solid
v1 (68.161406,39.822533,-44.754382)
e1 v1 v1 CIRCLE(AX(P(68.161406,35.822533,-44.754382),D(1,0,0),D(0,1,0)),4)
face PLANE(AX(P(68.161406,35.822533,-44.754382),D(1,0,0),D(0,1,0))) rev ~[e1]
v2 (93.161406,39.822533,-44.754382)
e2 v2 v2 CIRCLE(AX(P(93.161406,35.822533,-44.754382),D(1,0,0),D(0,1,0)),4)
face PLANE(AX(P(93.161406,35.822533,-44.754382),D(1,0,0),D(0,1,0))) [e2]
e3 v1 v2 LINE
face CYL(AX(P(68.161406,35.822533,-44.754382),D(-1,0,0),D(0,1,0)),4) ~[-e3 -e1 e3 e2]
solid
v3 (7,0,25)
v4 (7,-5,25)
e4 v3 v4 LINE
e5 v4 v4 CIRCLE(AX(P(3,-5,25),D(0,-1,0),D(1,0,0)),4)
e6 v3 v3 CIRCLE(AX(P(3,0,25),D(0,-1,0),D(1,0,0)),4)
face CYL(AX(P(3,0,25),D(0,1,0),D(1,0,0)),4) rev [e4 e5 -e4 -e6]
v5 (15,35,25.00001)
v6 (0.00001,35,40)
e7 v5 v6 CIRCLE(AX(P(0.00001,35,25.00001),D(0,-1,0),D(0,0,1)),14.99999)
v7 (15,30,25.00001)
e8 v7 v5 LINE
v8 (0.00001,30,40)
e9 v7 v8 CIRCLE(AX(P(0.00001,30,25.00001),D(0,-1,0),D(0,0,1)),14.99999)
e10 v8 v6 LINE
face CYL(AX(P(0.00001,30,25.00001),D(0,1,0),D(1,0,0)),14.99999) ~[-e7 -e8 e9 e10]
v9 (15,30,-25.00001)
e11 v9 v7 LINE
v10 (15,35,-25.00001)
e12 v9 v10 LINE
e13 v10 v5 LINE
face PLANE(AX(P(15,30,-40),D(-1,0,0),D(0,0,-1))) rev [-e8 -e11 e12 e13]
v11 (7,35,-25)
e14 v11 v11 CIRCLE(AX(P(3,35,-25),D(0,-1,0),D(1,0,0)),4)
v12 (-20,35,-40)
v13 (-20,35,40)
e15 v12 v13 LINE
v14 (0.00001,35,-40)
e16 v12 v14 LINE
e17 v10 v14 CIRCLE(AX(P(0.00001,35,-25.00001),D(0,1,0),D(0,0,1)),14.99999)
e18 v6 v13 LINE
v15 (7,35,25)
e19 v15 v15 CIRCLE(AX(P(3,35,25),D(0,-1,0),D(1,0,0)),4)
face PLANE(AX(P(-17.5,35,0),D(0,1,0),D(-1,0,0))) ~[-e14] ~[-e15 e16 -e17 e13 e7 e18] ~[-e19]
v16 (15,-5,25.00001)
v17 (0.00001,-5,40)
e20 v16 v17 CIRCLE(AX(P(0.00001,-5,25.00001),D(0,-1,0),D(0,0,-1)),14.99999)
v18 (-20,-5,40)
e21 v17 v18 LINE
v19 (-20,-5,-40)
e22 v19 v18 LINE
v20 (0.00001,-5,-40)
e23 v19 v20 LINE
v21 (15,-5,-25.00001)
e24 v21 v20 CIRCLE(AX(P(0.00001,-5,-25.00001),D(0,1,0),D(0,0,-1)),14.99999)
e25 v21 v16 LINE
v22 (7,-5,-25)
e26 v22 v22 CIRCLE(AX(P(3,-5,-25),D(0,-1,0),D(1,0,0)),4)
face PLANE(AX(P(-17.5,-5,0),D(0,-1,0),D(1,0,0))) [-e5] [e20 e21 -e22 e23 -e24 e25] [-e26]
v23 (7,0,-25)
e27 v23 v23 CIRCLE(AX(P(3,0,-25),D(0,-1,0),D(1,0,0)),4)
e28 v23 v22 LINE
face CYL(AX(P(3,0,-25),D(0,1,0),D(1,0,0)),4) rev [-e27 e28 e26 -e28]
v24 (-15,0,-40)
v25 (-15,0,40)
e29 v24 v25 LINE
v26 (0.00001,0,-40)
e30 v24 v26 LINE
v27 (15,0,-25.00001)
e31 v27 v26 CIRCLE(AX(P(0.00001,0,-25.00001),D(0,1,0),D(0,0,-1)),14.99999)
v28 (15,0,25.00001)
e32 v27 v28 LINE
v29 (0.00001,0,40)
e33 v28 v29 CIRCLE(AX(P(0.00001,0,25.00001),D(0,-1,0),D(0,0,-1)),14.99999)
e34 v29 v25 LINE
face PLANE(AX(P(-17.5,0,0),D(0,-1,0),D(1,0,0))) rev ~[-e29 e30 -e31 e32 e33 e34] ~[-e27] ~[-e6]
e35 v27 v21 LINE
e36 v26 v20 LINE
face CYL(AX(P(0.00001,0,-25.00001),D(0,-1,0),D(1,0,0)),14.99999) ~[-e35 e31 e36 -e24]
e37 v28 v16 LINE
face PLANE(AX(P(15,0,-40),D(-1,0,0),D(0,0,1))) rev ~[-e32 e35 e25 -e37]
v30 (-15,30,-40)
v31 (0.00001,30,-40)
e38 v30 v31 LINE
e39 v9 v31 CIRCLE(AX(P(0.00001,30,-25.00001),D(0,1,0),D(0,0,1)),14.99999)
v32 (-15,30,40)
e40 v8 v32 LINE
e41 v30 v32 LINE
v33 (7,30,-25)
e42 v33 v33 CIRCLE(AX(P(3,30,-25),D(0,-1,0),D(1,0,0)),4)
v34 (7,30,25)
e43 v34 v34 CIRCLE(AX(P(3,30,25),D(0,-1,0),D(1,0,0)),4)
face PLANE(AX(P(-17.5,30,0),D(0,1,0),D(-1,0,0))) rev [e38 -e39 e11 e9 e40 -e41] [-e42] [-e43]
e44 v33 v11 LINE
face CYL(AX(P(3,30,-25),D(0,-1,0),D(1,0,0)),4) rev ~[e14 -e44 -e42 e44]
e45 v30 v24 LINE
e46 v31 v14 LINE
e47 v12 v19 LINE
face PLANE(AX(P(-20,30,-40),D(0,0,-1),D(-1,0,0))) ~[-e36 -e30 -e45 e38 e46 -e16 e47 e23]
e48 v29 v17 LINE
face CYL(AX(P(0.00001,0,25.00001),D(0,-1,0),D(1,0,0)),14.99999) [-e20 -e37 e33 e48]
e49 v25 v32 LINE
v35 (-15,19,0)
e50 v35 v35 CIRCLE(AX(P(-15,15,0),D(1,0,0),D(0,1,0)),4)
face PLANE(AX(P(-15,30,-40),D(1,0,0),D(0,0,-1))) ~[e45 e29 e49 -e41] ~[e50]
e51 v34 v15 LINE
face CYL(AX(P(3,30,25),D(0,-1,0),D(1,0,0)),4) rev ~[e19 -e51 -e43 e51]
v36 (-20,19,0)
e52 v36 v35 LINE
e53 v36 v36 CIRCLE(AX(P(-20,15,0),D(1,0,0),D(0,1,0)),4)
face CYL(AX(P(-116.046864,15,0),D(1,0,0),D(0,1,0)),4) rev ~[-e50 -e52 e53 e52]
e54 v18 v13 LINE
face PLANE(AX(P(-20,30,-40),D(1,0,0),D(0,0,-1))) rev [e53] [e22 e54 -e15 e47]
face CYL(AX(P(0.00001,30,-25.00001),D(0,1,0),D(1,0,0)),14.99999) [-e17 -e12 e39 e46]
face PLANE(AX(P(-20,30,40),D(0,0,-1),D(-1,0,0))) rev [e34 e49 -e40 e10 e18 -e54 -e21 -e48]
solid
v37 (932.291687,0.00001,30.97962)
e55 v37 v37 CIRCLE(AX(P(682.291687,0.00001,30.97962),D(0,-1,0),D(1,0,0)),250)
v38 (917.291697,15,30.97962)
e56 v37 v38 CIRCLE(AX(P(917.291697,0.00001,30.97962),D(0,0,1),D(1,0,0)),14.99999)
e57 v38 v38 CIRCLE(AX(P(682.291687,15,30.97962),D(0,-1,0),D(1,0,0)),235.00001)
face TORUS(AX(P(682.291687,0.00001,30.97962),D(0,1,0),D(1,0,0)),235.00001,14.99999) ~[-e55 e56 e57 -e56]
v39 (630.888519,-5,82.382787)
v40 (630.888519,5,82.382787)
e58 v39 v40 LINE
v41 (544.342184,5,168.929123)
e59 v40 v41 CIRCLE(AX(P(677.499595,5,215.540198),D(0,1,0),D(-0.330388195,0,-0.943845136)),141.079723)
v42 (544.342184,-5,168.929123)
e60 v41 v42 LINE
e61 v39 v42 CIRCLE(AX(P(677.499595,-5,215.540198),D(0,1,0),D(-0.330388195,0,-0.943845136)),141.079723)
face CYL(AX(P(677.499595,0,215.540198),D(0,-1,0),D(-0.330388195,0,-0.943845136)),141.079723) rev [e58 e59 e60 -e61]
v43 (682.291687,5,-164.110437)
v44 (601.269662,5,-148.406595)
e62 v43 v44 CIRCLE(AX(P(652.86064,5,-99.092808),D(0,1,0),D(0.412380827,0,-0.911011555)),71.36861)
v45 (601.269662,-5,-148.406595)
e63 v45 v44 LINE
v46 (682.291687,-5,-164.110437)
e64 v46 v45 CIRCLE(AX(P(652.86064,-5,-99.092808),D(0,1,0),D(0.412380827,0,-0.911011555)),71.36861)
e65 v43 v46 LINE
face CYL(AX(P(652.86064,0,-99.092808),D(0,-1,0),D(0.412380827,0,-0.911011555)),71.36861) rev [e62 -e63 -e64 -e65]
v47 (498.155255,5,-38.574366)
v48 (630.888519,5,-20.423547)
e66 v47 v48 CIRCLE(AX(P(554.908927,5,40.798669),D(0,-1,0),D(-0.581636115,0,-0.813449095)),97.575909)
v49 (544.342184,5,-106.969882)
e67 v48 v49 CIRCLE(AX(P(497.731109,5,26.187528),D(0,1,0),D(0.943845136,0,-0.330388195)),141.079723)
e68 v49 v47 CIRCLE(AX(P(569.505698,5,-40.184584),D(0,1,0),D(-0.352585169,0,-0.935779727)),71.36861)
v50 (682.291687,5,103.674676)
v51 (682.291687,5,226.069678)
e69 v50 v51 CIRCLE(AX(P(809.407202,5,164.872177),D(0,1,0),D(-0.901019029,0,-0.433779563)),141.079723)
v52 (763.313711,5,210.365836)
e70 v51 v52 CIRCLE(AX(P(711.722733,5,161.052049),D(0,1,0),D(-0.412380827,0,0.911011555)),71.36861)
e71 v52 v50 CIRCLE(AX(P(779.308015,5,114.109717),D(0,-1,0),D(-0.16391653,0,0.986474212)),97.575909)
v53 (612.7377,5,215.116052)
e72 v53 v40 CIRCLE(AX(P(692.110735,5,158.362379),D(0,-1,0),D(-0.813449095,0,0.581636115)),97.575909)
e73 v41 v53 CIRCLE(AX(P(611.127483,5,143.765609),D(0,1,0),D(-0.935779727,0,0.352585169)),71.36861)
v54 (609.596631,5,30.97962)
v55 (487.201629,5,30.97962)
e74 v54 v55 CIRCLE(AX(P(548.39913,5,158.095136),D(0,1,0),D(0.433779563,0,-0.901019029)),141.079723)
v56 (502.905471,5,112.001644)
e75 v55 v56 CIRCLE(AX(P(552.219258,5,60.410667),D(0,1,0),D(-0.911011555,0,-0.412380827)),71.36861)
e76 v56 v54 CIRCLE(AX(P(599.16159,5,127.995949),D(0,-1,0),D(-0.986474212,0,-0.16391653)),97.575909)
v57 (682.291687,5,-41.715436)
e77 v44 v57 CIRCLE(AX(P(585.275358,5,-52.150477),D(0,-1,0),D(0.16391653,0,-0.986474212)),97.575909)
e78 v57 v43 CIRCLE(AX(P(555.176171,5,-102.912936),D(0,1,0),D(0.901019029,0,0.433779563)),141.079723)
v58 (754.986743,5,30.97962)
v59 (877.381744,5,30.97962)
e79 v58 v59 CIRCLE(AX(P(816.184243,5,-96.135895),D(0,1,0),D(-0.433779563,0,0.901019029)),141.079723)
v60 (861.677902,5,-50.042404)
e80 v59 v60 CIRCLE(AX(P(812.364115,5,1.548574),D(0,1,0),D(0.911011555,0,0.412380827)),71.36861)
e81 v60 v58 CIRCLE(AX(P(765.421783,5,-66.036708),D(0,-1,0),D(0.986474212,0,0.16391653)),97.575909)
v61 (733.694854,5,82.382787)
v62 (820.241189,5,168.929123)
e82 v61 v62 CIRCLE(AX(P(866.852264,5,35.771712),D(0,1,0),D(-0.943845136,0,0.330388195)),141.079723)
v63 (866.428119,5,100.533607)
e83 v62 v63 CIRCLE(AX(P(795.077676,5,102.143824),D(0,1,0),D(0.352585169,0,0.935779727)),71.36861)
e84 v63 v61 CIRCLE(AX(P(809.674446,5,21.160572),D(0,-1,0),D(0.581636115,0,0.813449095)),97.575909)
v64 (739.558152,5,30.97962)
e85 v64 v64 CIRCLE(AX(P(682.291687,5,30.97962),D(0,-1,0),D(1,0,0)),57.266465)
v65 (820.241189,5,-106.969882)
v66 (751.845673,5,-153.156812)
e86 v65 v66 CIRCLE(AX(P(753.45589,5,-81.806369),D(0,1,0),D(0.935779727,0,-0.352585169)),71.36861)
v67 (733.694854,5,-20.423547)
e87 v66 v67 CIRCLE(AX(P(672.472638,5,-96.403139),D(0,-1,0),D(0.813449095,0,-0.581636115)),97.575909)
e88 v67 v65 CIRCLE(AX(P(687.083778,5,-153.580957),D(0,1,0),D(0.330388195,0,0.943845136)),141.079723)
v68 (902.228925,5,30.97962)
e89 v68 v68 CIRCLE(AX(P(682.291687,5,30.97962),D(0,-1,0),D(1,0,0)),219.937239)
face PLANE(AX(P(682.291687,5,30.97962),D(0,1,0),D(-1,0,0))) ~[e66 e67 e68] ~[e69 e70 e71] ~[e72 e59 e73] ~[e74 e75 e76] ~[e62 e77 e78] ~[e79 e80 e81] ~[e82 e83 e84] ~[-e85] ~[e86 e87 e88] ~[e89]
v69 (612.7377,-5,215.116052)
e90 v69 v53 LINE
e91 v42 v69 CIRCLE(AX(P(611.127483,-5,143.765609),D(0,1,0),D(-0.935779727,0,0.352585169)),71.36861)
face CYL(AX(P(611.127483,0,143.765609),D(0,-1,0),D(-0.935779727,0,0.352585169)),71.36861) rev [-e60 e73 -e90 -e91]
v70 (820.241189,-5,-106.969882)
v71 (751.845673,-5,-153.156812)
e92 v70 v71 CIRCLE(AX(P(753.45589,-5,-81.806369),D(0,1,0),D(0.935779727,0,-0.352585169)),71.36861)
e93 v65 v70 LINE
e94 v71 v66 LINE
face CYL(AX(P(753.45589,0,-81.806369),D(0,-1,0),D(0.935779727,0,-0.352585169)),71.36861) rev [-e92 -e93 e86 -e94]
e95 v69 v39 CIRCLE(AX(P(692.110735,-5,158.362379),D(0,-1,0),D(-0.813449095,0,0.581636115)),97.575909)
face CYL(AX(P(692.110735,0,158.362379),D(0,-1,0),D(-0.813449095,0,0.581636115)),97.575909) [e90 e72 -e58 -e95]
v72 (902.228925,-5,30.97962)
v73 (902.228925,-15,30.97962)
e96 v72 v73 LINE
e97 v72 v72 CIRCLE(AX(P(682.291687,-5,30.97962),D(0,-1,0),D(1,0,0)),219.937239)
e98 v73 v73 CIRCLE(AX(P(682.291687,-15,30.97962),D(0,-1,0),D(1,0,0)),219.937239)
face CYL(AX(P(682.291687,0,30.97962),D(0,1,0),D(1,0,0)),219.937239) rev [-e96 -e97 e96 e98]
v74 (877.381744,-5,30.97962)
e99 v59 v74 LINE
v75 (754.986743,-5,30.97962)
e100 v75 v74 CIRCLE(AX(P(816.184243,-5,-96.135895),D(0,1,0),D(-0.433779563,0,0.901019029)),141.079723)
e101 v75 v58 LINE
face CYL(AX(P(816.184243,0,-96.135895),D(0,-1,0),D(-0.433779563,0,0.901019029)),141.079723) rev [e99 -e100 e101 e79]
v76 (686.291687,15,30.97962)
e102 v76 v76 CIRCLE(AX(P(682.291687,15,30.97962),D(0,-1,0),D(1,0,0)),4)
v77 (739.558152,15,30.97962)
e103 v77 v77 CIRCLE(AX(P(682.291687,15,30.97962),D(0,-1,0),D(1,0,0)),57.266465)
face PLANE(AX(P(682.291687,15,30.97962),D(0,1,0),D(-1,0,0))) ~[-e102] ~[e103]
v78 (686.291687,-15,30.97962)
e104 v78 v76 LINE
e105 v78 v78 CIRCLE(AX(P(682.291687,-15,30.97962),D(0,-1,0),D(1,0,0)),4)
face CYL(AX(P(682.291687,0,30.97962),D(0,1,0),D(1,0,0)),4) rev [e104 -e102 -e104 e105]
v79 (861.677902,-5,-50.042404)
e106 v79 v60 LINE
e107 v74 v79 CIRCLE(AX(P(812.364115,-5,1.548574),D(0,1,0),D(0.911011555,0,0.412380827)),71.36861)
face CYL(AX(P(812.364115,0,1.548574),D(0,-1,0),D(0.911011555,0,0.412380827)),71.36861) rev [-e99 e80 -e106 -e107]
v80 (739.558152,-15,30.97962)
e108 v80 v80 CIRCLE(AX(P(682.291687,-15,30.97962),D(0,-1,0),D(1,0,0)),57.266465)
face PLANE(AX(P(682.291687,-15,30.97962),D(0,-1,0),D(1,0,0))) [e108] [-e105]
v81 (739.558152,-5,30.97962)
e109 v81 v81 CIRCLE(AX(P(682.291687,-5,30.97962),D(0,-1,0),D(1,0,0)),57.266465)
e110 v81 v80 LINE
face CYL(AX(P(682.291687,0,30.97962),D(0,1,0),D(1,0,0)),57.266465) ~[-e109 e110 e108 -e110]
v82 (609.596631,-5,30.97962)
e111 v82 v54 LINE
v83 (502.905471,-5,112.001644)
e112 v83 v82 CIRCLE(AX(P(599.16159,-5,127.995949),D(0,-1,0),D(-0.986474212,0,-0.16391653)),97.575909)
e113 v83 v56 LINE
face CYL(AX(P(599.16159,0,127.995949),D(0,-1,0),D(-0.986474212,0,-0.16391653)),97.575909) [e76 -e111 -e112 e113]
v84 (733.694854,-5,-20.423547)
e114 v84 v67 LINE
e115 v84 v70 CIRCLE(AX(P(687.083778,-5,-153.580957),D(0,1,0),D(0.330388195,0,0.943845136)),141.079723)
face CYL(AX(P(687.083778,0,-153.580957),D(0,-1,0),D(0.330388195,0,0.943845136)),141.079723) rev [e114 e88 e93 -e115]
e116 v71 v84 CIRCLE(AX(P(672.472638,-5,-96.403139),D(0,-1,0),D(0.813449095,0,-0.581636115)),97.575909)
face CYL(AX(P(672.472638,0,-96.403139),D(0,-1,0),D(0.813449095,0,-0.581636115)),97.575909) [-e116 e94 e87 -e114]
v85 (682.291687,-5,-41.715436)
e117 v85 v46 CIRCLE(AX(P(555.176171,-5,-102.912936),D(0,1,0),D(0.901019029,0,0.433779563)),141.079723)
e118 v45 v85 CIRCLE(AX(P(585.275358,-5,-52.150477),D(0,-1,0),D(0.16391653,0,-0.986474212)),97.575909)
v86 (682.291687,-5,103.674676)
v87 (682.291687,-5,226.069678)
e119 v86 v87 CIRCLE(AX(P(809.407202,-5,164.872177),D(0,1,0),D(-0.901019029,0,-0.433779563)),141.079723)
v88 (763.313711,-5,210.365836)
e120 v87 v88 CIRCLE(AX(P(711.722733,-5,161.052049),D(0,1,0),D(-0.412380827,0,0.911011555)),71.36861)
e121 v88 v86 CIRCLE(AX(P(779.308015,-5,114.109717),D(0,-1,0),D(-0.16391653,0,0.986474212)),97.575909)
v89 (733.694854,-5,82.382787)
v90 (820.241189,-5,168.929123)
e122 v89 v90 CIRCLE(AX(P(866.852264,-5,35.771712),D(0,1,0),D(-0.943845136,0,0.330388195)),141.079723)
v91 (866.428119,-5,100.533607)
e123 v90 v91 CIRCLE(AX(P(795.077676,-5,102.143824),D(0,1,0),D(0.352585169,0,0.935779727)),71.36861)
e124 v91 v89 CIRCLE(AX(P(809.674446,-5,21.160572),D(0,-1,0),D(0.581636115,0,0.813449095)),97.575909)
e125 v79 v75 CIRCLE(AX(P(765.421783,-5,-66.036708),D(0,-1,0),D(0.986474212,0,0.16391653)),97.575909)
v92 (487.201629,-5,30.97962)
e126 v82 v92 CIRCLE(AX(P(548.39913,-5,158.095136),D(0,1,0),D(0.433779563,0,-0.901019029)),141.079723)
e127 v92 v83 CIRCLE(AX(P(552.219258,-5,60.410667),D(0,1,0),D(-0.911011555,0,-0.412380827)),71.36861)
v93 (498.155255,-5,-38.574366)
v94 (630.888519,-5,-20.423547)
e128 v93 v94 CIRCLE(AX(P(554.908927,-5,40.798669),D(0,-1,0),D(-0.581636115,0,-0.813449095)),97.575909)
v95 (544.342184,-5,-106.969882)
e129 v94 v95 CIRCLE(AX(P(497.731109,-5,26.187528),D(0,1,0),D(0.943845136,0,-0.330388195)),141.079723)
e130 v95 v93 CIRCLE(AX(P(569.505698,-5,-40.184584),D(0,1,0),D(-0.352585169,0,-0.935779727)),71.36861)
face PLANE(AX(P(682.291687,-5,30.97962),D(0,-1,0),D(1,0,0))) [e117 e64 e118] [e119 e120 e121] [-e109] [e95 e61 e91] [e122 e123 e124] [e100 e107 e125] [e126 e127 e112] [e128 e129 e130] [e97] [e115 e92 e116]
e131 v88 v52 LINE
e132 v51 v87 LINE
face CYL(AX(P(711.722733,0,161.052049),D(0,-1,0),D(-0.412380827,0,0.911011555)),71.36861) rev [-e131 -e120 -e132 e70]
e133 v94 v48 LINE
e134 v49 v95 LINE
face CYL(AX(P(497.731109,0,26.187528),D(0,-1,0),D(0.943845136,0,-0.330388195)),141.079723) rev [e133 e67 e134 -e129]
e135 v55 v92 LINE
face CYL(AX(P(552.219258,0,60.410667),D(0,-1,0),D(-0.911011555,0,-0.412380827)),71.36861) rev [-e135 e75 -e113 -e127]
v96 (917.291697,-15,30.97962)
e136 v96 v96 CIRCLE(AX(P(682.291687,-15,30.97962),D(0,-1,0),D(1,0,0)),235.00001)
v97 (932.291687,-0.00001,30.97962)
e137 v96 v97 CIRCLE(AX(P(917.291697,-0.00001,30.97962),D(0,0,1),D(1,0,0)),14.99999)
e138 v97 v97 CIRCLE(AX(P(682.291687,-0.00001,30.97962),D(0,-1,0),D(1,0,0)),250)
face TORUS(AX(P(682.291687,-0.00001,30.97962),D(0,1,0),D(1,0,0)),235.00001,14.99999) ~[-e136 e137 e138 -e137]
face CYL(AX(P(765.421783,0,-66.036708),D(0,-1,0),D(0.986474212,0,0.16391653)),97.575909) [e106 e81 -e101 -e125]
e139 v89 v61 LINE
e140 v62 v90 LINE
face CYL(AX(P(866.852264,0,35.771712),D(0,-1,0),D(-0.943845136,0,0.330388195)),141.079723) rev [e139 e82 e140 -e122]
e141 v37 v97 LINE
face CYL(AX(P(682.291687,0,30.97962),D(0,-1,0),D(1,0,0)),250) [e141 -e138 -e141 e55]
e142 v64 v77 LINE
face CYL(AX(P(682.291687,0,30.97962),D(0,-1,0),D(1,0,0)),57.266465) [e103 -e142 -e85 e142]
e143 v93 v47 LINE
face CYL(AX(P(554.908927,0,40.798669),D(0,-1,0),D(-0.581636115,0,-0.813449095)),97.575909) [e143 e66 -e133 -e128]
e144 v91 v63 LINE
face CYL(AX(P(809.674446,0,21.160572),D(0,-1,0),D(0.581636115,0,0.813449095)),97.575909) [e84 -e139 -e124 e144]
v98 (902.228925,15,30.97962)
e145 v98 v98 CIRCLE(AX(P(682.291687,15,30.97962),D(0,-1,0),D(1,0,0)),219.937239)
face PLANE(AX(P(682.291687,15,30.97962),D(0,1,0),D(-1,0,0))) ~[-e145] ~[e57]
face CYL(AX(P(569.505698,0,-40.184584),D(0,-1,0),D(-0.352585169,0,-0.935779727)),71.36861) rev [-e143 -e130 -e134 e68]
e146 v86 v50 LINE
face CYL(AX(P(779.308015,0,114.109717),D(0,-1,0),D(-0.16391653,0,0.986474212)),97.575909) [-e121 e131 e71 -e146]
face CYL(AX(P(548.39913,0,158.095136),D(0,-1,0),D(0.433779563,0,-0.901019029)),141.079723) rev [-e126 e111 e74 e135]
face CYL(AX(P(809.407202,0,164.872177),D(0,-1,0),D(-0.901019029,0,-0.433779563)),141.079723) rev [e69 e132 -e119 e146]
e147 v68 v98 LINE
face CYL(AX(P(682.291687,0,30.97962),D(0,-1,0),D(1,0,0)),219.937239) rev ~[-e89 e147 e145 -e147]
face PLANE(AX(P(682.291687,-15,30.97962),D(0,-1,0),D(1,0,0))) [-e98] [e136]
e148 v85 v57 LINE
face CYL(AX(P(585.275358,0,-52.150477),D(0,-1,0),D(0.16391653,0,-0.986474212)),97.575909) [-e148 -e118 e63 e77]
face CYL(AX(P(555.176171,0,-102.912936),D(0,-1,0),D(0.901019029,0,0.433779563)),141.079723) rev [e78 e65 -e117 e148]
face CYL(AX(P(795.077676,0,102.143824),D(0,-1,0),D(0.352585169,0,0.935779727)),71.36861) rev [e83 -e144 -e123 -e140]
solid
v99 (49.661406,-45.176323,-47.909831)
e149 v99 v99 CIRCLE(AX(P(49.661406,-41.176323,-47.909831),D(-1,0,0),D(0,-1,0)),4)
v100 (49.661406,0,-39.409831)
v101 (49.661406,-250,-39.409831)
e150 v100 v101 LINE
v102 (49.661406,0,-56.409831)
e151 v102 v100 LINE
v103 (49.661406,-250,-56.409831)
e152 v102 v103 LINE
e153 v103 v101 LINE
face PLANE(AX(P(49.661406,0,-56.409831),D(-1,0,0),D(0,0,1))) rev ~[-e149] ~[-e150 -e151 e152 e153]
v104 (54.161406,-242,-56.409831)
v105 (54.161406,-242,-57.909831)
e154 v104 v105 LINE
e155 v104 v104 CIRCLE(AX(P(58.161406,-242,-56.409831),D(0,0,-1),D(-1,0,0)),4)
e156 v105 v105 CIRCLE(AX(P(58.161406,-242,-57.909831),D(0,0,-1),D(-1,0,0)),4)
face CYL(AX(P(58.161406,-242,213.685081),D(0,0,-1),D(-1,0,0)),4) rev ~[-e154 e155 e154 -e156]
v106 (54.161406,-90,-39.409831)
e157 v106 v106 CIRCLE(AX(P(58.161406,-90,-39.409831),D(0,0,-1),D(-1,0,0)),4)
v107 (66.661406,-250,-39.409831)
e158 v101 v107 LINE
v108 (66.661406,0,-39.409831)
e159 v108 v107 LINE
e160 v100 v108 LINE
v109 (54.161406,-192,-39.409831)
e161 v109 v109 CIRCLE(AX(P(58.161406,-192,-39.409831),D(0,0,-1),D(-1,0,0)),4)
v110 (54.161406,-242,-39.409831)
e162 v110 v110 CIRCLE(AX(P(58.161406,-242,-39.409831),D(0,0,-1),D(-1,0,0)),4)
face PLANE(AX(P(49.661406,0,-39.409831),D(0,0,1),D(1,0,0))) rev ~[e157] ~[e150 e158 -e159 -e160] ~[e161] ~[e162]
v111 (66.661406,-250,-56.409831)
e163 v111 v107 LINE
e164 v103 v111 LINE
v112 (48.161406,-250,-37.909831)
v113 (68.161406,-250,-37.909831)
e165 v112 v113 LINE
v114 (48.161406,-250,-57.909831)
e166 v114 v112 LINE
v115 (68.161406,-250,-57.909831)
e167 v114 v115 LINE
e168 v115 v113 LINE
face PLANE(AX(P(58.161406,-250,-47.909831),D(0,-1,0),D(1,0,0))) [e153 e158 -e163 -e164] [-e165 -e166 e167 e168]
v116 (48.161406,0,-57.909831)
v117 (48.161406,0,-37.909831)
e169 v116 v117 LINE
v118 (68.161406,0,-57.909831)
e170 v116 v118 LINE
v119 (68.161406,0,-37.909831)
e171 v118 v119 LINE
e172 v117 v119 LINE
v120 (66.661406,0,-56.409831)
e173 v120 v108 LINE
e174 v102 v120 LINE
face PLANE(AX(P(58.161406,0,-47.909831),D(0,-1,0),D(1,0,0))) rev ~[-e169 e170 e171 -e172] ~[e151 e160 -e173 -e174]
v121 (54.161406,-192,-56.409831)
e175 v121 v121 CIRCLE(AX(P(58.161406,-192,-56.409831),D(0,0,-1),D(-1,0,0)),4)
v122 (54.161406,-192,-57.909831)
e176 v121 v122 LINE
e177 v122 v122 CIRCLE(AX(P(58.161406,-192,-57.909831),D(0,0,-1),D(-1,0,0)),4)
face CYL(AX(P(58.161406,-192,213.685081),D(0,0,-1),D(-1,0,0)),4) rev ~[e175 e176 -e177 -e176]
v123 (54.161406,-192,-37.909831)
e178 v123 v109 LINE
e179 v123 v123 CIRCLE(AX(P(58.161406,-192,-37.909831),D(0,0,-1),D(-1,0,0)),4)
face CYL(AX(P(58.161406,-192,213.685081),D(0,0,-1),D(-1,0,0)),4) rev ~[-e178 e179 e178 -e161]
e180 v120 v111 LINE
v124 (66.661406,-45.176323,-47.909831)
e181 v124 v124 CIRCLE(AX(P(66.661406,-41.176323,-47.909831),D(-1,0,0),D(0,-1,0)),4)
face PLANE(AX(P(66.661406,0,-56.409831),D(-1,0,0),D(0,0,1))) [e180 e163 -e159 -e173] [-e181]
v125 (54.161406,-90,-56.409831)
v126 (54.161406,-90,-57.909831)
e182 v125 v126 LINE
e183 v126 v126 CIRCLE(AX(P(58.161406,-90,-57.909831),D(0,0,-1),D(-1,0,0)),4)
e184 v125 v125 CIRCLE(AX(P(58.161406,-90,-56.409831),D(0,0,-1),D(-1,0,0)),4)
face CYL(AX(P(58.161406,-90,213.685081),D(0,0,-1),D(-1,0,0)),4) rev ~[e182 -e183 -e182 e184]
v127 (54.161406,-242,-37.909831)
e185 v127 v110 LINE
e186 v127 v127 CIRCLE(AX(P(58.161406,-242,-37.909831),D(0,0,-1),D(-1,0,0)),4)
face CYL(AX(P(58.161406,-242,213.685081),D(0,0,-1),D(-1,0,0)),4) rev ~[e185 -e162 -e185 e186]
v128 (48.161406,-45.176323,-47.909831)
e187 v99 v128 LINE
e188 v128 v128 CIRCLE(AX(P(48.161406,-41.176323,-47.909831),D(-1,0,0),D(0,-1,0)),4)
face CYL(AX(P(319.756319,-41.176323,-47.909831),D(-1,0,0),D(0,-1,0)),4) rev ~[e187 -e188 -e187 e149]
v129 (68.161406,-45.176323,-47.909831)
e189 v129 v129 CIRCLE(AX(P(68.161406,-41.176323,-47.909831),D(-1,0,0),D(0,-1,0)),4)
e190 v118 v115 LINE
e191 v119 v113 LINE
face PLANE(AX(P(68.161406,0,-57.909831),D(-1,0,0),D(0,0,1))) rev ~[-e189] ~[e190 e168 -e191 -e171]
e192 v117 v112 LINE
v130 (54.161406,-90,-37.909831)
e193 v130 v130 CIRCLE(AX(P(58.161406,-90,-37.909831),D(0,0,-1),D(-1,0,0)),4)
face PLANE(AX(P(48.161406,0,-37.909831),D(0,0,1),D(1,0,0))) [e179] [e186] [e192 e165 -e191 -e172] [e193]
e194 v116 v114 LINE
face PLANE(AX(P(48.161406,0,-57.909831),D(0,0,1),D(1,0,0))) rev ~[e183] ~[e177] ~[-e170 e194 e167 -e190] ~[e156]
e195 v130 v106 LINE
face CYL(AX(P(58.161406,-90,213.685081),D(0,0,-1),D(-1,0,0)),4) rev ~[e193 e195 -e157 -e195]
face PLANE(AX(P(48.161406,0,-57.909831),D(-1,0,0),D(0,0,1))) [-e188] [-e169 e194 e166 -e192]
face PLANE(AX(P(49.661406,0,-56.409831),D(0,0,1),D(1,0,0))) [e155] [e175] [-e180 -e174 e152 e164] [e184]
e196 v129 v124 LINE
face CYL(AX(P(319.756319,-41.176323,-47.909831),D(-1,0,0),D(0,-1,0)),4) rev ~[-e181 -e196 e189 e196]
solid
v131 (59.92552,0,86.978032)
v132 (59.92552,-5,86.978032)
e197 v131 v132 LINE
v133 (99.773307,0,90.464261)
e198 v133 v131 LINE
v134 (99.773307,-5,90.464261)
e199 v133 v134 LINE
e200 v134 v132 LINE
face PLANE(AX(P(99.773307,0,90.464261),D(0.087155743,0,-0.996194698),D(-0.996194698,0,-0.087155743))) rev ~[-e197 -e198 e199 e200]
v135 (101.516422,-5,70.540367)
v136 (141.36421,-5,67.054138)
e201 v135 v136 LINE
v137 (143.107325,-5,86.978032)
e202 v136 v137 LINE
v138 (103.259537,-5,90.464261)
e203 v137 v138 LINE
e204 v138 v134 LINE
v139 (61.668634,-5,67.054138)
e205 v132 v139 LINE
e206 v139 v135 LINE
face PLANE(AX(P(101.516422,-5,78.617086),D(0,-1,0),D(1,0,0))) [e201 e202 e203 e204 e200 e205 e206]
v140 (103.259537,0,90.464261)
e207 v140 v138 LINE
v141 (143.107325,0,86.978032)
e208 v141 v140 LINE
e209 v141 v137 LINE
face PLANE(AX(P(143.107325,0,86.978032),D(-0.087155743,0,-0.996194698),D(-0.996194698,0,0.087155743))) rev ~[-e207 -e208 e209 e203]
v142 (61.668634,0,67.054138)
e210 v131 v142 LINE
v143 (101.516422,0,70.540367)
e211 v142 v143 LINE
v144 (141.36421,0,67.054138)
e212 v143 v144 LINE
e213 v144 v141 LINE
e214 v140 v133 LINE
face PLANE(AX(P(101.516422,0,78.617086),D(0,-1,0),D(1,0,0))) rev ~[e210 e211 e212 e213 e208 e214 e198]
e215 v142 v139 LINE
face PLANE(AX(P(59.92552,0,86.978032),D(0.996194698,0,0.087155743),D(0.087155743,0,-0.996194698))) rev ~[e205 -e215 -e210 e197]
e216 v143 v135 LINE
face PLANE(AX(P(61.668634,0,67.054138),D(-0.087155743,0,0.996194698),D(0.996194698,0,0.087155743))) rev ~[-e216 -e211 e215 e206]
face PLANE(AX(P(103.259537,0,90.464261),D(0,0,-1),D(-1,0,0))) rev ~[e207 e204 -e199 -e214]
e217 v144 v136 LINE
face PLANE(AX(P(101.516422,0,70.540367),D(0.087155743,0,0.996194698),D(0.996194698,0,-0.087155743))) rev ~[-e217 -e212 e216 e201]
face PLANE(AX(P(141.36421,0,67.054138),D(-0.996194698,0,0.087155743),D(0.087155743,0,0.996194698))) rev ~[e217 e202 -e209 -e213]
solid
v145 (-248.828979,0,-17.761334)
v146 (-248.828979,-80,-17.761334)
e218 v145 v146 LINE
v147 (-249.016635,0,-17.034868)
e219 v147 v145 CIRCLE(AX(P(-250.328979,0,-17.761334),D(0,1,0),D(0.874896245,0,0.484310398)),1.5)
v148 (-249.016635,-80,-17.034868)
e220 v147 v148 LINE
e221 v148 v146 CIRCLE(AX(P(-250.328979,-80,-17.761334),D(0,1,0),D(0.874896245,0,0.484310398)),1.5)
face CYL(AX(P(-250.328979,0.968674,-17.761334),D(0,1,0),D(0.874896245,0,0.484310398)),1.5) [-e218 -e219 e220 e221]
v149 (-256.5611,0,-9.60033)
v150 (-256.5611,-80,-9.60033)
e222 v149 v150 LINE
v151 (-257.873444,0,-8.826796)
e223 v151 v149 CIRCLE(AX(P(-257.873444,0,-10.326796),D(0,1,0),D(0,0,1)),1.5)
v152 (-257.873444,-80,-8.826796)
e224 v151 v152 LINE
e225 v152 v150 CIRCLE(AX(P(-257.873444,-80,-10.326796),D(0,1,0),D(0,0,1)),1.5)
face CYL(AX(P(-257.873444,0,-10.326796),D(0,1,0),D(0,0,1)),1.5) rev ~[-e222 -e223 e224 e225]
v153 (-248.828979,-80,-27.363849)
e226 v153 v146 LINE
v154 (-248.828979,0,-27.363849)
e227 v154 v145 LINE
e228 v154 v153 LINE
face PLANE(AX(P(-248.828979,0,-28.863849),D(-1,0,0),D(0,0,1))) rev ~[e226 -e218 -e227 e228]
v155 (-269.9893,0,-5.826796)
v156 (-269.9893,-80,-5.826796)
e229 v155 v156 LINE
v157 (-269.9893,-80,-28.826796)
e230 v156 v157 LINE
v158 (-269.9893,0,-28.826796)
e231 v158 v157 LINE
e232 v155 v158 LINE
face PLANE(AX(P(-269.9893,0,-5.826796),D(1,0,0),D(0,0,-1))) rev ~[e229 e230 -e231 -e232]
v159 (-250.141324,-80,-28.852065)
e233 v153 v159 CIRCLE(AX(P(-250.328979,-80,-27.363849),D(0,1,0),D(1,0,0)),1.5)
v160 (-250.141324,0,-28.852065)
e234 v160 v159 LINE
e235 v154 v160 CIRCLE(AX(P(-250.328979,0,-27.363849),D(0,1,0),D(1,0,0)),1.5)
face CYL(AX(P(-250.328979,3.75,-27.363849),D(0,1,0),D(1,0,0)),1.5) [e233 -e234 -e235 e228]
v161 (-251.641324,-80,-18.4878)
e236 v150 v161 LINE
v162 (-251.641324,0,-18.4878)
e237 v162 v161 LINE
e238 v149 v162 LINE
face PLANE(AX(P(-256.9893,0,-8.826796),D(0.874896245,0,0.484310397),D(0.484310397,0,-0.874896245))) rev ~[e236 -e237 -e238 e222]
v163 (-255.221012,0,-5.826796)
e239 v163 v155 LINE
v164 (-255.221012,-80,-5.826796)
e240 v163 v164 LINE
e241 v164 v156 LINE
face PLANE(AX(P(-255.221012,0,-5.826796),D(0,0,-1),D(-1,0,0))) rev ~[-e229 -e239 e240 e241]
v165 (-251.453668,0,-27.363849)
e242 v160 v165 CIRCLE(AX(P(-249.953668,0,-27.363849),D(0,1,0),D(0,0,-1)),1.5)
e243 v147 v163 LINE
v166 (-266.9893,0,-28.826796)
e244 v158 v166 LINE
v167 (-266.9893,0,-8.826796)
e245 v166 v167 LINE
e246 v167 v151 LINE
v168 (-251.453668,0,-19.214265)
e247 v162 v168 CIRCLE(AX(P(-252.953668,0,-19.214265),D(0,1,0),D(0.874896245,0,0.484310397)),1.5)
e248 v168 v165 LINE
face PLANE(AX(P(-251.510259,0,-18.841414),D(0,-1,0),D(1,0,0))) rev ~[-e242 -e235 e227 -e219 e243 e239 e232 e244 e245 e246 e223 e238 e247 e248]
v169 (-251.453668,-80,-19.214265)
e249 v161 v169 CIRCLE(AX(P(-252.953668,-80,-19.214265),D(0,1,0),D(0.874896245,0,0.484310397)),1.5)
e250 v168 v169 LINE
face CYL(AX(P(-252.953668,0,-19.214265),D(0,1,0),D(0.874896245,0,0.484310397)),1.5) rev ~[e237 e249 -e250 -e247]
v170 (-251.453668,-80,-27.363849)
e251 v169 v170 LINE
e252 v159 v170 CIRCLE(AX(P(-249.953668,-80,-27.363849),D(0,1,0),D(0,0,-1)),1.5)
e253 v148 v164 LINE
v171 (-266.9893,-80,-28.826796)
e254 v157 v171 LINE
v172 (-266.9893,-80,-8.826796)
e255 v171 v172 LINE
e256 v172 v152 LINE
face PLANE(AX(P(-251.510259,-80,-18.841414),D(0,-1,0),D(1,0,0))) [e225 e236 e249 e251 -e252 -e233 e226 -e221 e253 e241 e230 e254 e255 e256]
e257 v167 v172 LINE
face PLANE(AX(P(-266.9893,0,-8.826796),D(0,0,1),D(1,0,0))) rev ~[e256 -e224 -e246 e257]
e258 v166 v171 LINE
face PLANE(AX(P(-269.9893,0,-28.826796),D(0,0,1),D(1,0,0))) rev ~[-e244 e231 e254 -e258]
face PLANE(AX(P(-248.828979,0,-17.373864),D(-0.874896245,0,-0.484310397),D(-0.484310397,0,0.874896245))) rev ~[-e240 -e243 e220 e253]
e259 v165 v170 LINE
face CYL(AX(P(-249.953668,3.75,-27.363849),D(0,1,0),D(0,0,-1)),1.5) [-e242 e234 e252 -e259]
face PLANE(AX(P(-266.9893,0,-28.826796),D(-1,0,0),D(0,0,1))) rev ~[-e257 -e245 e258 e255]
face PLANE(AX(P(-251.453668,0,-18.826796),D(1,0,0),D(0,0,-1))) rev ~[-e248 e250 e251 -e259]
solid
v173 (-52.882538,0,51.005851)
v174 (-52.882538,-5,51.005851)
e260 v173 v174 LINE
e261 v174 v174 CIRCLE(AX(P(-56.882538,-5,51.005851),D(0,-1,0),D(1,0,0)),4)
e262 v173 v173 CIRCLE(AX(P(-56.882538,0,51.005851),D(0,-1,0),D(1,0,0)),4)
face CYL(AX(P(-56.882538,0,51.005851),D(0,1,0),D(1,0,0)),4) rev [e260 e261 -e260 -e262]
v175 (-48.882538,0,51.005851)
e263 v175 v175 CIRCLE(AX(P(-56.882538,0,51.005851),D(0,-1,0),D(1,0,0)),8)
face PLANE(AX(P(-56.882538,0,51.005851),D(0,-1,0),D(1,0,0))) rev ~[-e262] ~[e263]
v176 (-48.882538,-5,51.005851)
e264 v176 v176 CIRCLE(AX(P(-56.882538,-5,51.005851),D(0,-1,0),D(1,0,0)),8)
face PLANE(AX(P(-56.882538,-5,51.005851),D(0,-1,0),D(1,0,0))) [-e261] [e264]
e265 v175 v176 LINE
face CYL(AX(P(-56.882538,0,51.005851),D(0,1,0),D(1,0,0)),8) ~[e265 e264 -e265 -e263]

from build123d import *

# Parameters (mm, degrees)
F0_W         = 5
F0_H         = 80
F0_W_2       = 30
F0_R         = 4
F1_DEPTH     = 5
F2_DEPTH     = 15
F0_W_3       = 20
F0_H_2       = 20
F0_W_4       = 17
F0_H_3       = 17
F5_DEPTH     = 250
F0_R_2       = 250
F0_R_3       = 219.9372385263
F6_DEPTH     = 15
F0_R_4       = 57.2664650893
F7_DEPTH     = 5
F9_R         = 14.99999
F9_2_R       = 14.99999
F11_DEPTH    = 5
F0_R_5       = 8
F12_DEPTH    = 80
F13_T1_DEPTH = 80
F13_T3_DEPTH = 87.5
F13_T5_DEPTH = 81.9373487951
F15_D        = 8
F15_ON_F10_D = 8
F15_ON_F14_D = 8
F14_R        = 4
F16_DEPTH    = 25


# Not quite as in the source:
# - a fillet or chamfer that OpenCascade refuses, or shapes differently, is made with other operations: its cross-section is extruded or revolved along the edge and cut away or added
# - a fillet or chamfer is up to 0.001 mm smaller than in the source, because OpenCascade refuses the exact size


with BuildPart() as f1:
    # F0 (on Front) → F1 (new body)
    with BuildSketch(Plane.XZ):
        with Locations((-17.5, 0)):
            Rectangle(F0_W, F0_H)
        Rectangle(F0_W_2, F0_H)
        with Locations((3, -25)):
            Circle(F0_R, mode=Mode.SUBTRACT)
        with Locations((3, 25)):
            Circle(F0_R, mode=Mode.SUBTRACT)
    extrude(amount=F1_DEPTH)

    # F0 (on Front) → F2 (join)
    with BuildSketch(Plane.XZ):
        with Locations((-17.5, 0)):
            Rectangle(F0_W, F0_H)
    extrude(amount=-F2_DEPTH)

    # F3: F1 across face


with BuildPart() as f1_1:
    add(f1.part)
    add(f1.part.mirror(Plane(origin=(-17.5, 15, 0), x_dir=(1, 0, 0), z_dir=(0, 1, 0))))

    # F9 (radius 15 in the source; OpenCascade refuses exactly that, so slightly less here)
    f9_edges = [f1_1.edges().sort_by_distance(p)[0] for p in [
        (15, -2.5, 40),
        (15, 32.5, 40),
        (15, 32.5, -40),
        (15, -2.5, -40),
    ]]
    fillet(f9_edges, radius=F9_R)

    # F15 (through all)
    with Locations(Plane(origin=(-20, 0, 0), x_dir=(0, -1, 0), z_dir=(-1, 0, 0))):
        with Locations((-15, 0)):
            Hole(F15_D / 2)


with BuildPart() as f5:
    # F0 (on Front) → F5 (new body)
    with BuildSketch(Plane.XZ):
        with Locations((58.16140607, -47.9098314047)):
            Rectangle(F0_W_3, F0_H_2)
        with Locations((58.16140607, -47.9098314047)):
            Rectangle(F0_W_4, F0_H_3, mode=Mode.SUBTRACT)
    extrude(amount=F5_DEPTH)

    # F15 on F10 (through all)
    with Locations(Plane.XY.offset(-37.9098314047)):
        with Locations((58.16140607, -242), (58.16140607, -192), (58.16140607, -90)):
            Hole(F15_ON_F10_D / 2)

    # F15 on F14 (through all)
    with Locations(Plane.YZ.offset(68.16140607)):
        with Locations((-41.1763228476, -47.9098314047)):
            Hole(F15_ON_F14_D / 2)


with BuildPart() as f6:
    # F0 (on Front) → F6 (new body)
    with BuildSketch(Plane.XZ):
        with Locations((682.2916865349, 30.9796202928)):
            Circle(F0_R_2)
        with Locations((682.2916865349, 30.9796202928)):
            Circle(F0_R_3, mode=Mode.SUBTRACT)
    extrude(amount=F6_DEPTH)



with BuildPart() as f6b:
    # F0 (on Front) → F6, piece 2 (new body)
    with BuildSketch(Plane.XZ):
        with Locations((682.2916865349, 30.9796202928)):
            Circle(F0_R_4)
        with Locations((682.2916865349, 30.9796202928)):
            Circle(F0_R, mode=Mode.SUBTRACT)
    extrude(amount=F6_DEPTH)


with BuildPart() as f6_1:
    add(f6.part)

    add(f6b.part)  # F7 merges F6b
    # F0 (on Front) → F7 (join)
    with BuildSketch(Plane.XZ):
        with Locations((682.2916865349, 30.9796202928)):
            Circle(F0_R_3)
        with BuildLine():
            ThreePointArc((682.2916865349, -164.1104370356), (639.2805700509, -169.1574944329), (601.2696623802, -148.4065949917))
            ThreePointArc((601.2696623802, -148.4065949917), (662.9837980392, -111.1628179813), (682.2916865349, -41.7154356837))
            ThreePointArc((682.2916865349, -41.7154356837), (696.2558945086, -102.9129363596), (682.2916865349, -164.1104370356))
        make_face(mode=Mode.SUBTRACT)
        with BuildLine():
            ThreePointArc((544.3421840559, -106.9698821862), (510.359923413, -80.1252385646), (498.1552545506, -38.574366281))
            ThreePointArc((498.1552545506, -38.574366281), (568.1290656512, -55.8775228195), (630.8885194952, -20.4235467469))
            ThreePointArc((630.8885194952, -20.4235467469), (597.4895379277, -73.5709006187), (544.3421840559, -106.9698821862))
        make_face(mode=Mode.SUBTRACT)
        with BuildLine():
            ThreePointArc((820.2411890138, -106.9698821862), (793.3965453923, -140.9521428291), (751.8456731087, -153.1568116915))
            ThreePointArc((751.8456731087, -153.1568116915), (769.1488296472, -83.1830005909), (733.6948535746, -20.4235467469))
            ThreePointArc((733.6948535746, -20.4235467469), (786.8422074464, -53.8225283144), (820.2411890138, -106.9698821862))
        make_face(mode=Mode.SUBTRACT)
        with BuildLine():
            ThreePointArc((877.3817438632, 30.9796202928), (882.4288012606, -12.0314961912), (861.6779018193, -50.0424038619))
            ThreePointArc((861.6779018193, -50.0424038619), (824.4341248089, 11.6717317971), (754.9867425114, 30.9796202928))
            ThreePointArc((754.9867425114, 30.9796202928), (816.1842431873, 44.9438282665), (877.3817438632, 30.9796202928))
        make_face(mode=Mode.SUBTRACT)
        with BuildLine():
            ThreePointArc((487.2016292065, 30.9796202928), (482.1545718092, 73.9907367768), (502.9054712504, 112.0016444474))
            ThreePointArc((502.9054712504, 112.0016444474), (540.1492482608, 50.2875087884), (609.5966305584, 30.9796202928))
            ThreePointArc((609.5966305584, 30.9796202928), (548.3991298825, 17.015412319), (487.2016292065, 30.9796202928))
        make_face(mode=Mode.SUBTRACT)
        with BuildLine():
            ThreePointArc((544.3421840559, 168.9291227717), (571.1868276775, 202.9113834147), (612.7376999611, 215.116052277))
            ThreePointArc((612.7376999611, 215.116052277), (595.4345434226, 145.1422411764), (630.8885194952, 82.3827873325))
            ThreePointArc((630.8885194952, 82.3827873325), (577.7411656234, 115.7817689), (544.3421840559, 168.9291227717))
        make_face(mode=Mode.SUBTRACT)
        with Locations((682.2916865349, 30.9796202928)):
            Circle(F0_R_4, mode=Mode.SUBTRACT)
        with BuildLine():
            ThreePointArc((820.2411890138, 168.9291227717), (854.2234496568, 142.0844791502), (866.4281185191, 100.5336068666))
            ThreePointArc((866.4281185191, 100.5336068666), (796.4543074185, 117.8367634051), (733.6948535746, 82.3827873325))
            ThreePointArc((733.6948535746, 82.3827873325), (767.0938351421, 135.5301412043), (820.2411890138, 168.9291227717))
        make_face(mode=Mode.SUBTRACT)
        with BuildLine():
            ThreePointArc((682.2916865349, 226.0696776211), (725.3028030189, 231.1167350185), (763.3137106895, 210.3658355772))
            ThreePointArc((763.3137106895, 210.3658355772), (701.5995750305, 173.1220585668), (682.2916865349, 103.6746762693))
            ThreePointArc((682.2916865349, 103.6746762693), (668.3274785611, 164.8721769452), (682.2916865349, 226.0696776211))
        make_face(mode=Mode.SUBTRACT)
    extrude(amount=F7_DEPTH)

    # F8: F6 across face


with BuildPart() as f6_2:
    add(f6_1.part)
    add(f6_1.part.mirror(Plane(origin=(682.2916865349, 0, 30.9796202928), x_dir=(-1, 0, 0), z_dir=(0, 1, 0))))

    # F9#2 (radius 15 in the source; OpenCascade refuses exactly that, so slightly less here)
    f9_2_edges = [f6_2.edges().sort_by_distance(p)[0] for p in [
        (932.291687, -7.5, 30.97962),
        (432.291687, 0, 30.97962),
        (432.291687, -15, 30.97962),
        (932.291687, 7.5, 30.97962),
        (432.291687, 15, 30.97962),
    ]]
    fillet(f9_2_edges, radius=F9_2_R)


with BuildPart() as f11:
    # F0 (on Front) → F11 (new body)
    with BuildSketch(Plane.XZ):
        Polygon((59.9255195597, 86.9780315494), (61.6686344147, 67.0541375875), (101.5164223383, 70.5403672975), (141.364210262, 67.0541375875), (143.107325117, 86.9780315494), (103.2595371933, 90.4642612593), (99.7733074834, 90.4642612593), align=None)
    extrude(amount=F11_DEPTH)


with BuildPart() as f11b:
    # F0 (on Front) → F11, piece 2 (new body)
    with BuildSketch(Plane.XZ):
        with Locations((-56.8825379014, 51.0058514774)):
            Circle(F0_R_5)
        with Locations((-56.8825379014, 51.0058514774)):
            Circle(F0_R, mode=Mode.SUBTRACT)
    extrude(amount=F11_DEPTH)


with BuildPart() as f12:
    # F0 (on Front) → F12 (new body)
    with BuildSketch(Plane.XZ):
        Polygon((-266.989300251, -28.8267955184), (-266.989300251, -8.8267955184), (-256.989300251, -8.8267955184), (-251.4536678791, -18.8267955184), (-251.4536678791, -28.8638491184), (-248.8289791451, -28.8638491184), (-248.8289791451, -17.3738643262), (-255.2210119343, -5.8267955184), (-269.989300251, -5.8267955184), (-269.989300251, -28.8267955184), align=None)
    extrude(amount=F12_DEPTH)

    # F13: fillet of radius 1.5 on 5 edges, made by hand

    # F13_s2 → F13_t1 (join)
    with BuildSketch(Plane.XZ):
        with BuildLine():
            ThreePointArc((-251.6413235121, -18.4877996813), (-251.5013393091, -18.8391096767), (-251.4536678791, -19.2142652774))
            Line((-251.4536678791, -19.2142652774), (-251.4536678791, -18.8267955184))
            Line((-251.4536678791, -18.8267955184), (-251.6413235121, -18.4877996813))
        make_face()
        with BuildLine():
            ThreePointArc((-257.8734444093, -8.8267955184), (-257.1117680982, -9.0345690688), (-256.5611000423, -9.6003299223))
            Line((-256.5611000423, -9.6003299223), (-256.989300251, -8.8267955184))
            Line((-256.989300251, -8.8267955184), (-257.8734444093, -8.8267955184))
        make_face()
    extrude(amount=F13_T1_DEPTH)

    # F13_s4 → F13_t3 (cut)
    with BuildSketch(Plane.XZ.offset(-3.75)):
        with BuildLine():
            ThreePointArc((-249.9536678791, -28.8638491184), (-251.0143280509, -28.4245092901), (-251.4536678791, -27.3638491184))
            Line((-251.4536678791, -27.3638491184), (-251.4536678791, -28.8638491184))
            Line((-251.4536678791, -28.8638491184), (-249.9536678791, -28.8638491184))
        make_face()
        with BuildLine():
            ThreePointArc((-248.8289791451, -27.3638491184), (-249.2683189733, -28.4245092901), (-250.3289791451, -28.8638491184))
            Line((-250.3289791451, -28.8638491184), (-248.8289791451, -28.8638491184))
            Line((-248.8289791451, -28.8638491184), (-248.8289791451, -27.3638491184))
        make_face()
    extrude(amount=F13_T3_DEPTH, mode=Mode.SUBTRACT)

    # F13_s6 → F13_t5 (cut)
    with BuildSketch(Plane.XZ.offset(-0.9686743976)):
        with BuildLine():
            ThreePointArc((-249.016634778, -17.0348684891), (-248.876650575, -17.3861784845), (-248.8289791451, -17.7613340852))
            Line((-248.8289791451, -17.7613340852), (-248.8289791451, -17.3738643262))
            Line((-248.8289791451, -17.3738643262), (-249.016634778, -17.0348684891))
        make_face()
    extrude(amount=F13_T5_DEPTH, mode=Mode.SUBTRACT)


with BuildPart() as f16:
    # F14 (on face) → F16 (new body)
    with BuildSketch(Plane.YZ.offset(68.16140607)):
        with Locations((35.822533071, -44.7543822229)):
            Circle(F14_R)
    extrude(amount=F16_DEPTH)


solid = Compound([f1_1.part, f5.part, f6_2.part, f11.part, f11b.part, f12.part, f16.part])
